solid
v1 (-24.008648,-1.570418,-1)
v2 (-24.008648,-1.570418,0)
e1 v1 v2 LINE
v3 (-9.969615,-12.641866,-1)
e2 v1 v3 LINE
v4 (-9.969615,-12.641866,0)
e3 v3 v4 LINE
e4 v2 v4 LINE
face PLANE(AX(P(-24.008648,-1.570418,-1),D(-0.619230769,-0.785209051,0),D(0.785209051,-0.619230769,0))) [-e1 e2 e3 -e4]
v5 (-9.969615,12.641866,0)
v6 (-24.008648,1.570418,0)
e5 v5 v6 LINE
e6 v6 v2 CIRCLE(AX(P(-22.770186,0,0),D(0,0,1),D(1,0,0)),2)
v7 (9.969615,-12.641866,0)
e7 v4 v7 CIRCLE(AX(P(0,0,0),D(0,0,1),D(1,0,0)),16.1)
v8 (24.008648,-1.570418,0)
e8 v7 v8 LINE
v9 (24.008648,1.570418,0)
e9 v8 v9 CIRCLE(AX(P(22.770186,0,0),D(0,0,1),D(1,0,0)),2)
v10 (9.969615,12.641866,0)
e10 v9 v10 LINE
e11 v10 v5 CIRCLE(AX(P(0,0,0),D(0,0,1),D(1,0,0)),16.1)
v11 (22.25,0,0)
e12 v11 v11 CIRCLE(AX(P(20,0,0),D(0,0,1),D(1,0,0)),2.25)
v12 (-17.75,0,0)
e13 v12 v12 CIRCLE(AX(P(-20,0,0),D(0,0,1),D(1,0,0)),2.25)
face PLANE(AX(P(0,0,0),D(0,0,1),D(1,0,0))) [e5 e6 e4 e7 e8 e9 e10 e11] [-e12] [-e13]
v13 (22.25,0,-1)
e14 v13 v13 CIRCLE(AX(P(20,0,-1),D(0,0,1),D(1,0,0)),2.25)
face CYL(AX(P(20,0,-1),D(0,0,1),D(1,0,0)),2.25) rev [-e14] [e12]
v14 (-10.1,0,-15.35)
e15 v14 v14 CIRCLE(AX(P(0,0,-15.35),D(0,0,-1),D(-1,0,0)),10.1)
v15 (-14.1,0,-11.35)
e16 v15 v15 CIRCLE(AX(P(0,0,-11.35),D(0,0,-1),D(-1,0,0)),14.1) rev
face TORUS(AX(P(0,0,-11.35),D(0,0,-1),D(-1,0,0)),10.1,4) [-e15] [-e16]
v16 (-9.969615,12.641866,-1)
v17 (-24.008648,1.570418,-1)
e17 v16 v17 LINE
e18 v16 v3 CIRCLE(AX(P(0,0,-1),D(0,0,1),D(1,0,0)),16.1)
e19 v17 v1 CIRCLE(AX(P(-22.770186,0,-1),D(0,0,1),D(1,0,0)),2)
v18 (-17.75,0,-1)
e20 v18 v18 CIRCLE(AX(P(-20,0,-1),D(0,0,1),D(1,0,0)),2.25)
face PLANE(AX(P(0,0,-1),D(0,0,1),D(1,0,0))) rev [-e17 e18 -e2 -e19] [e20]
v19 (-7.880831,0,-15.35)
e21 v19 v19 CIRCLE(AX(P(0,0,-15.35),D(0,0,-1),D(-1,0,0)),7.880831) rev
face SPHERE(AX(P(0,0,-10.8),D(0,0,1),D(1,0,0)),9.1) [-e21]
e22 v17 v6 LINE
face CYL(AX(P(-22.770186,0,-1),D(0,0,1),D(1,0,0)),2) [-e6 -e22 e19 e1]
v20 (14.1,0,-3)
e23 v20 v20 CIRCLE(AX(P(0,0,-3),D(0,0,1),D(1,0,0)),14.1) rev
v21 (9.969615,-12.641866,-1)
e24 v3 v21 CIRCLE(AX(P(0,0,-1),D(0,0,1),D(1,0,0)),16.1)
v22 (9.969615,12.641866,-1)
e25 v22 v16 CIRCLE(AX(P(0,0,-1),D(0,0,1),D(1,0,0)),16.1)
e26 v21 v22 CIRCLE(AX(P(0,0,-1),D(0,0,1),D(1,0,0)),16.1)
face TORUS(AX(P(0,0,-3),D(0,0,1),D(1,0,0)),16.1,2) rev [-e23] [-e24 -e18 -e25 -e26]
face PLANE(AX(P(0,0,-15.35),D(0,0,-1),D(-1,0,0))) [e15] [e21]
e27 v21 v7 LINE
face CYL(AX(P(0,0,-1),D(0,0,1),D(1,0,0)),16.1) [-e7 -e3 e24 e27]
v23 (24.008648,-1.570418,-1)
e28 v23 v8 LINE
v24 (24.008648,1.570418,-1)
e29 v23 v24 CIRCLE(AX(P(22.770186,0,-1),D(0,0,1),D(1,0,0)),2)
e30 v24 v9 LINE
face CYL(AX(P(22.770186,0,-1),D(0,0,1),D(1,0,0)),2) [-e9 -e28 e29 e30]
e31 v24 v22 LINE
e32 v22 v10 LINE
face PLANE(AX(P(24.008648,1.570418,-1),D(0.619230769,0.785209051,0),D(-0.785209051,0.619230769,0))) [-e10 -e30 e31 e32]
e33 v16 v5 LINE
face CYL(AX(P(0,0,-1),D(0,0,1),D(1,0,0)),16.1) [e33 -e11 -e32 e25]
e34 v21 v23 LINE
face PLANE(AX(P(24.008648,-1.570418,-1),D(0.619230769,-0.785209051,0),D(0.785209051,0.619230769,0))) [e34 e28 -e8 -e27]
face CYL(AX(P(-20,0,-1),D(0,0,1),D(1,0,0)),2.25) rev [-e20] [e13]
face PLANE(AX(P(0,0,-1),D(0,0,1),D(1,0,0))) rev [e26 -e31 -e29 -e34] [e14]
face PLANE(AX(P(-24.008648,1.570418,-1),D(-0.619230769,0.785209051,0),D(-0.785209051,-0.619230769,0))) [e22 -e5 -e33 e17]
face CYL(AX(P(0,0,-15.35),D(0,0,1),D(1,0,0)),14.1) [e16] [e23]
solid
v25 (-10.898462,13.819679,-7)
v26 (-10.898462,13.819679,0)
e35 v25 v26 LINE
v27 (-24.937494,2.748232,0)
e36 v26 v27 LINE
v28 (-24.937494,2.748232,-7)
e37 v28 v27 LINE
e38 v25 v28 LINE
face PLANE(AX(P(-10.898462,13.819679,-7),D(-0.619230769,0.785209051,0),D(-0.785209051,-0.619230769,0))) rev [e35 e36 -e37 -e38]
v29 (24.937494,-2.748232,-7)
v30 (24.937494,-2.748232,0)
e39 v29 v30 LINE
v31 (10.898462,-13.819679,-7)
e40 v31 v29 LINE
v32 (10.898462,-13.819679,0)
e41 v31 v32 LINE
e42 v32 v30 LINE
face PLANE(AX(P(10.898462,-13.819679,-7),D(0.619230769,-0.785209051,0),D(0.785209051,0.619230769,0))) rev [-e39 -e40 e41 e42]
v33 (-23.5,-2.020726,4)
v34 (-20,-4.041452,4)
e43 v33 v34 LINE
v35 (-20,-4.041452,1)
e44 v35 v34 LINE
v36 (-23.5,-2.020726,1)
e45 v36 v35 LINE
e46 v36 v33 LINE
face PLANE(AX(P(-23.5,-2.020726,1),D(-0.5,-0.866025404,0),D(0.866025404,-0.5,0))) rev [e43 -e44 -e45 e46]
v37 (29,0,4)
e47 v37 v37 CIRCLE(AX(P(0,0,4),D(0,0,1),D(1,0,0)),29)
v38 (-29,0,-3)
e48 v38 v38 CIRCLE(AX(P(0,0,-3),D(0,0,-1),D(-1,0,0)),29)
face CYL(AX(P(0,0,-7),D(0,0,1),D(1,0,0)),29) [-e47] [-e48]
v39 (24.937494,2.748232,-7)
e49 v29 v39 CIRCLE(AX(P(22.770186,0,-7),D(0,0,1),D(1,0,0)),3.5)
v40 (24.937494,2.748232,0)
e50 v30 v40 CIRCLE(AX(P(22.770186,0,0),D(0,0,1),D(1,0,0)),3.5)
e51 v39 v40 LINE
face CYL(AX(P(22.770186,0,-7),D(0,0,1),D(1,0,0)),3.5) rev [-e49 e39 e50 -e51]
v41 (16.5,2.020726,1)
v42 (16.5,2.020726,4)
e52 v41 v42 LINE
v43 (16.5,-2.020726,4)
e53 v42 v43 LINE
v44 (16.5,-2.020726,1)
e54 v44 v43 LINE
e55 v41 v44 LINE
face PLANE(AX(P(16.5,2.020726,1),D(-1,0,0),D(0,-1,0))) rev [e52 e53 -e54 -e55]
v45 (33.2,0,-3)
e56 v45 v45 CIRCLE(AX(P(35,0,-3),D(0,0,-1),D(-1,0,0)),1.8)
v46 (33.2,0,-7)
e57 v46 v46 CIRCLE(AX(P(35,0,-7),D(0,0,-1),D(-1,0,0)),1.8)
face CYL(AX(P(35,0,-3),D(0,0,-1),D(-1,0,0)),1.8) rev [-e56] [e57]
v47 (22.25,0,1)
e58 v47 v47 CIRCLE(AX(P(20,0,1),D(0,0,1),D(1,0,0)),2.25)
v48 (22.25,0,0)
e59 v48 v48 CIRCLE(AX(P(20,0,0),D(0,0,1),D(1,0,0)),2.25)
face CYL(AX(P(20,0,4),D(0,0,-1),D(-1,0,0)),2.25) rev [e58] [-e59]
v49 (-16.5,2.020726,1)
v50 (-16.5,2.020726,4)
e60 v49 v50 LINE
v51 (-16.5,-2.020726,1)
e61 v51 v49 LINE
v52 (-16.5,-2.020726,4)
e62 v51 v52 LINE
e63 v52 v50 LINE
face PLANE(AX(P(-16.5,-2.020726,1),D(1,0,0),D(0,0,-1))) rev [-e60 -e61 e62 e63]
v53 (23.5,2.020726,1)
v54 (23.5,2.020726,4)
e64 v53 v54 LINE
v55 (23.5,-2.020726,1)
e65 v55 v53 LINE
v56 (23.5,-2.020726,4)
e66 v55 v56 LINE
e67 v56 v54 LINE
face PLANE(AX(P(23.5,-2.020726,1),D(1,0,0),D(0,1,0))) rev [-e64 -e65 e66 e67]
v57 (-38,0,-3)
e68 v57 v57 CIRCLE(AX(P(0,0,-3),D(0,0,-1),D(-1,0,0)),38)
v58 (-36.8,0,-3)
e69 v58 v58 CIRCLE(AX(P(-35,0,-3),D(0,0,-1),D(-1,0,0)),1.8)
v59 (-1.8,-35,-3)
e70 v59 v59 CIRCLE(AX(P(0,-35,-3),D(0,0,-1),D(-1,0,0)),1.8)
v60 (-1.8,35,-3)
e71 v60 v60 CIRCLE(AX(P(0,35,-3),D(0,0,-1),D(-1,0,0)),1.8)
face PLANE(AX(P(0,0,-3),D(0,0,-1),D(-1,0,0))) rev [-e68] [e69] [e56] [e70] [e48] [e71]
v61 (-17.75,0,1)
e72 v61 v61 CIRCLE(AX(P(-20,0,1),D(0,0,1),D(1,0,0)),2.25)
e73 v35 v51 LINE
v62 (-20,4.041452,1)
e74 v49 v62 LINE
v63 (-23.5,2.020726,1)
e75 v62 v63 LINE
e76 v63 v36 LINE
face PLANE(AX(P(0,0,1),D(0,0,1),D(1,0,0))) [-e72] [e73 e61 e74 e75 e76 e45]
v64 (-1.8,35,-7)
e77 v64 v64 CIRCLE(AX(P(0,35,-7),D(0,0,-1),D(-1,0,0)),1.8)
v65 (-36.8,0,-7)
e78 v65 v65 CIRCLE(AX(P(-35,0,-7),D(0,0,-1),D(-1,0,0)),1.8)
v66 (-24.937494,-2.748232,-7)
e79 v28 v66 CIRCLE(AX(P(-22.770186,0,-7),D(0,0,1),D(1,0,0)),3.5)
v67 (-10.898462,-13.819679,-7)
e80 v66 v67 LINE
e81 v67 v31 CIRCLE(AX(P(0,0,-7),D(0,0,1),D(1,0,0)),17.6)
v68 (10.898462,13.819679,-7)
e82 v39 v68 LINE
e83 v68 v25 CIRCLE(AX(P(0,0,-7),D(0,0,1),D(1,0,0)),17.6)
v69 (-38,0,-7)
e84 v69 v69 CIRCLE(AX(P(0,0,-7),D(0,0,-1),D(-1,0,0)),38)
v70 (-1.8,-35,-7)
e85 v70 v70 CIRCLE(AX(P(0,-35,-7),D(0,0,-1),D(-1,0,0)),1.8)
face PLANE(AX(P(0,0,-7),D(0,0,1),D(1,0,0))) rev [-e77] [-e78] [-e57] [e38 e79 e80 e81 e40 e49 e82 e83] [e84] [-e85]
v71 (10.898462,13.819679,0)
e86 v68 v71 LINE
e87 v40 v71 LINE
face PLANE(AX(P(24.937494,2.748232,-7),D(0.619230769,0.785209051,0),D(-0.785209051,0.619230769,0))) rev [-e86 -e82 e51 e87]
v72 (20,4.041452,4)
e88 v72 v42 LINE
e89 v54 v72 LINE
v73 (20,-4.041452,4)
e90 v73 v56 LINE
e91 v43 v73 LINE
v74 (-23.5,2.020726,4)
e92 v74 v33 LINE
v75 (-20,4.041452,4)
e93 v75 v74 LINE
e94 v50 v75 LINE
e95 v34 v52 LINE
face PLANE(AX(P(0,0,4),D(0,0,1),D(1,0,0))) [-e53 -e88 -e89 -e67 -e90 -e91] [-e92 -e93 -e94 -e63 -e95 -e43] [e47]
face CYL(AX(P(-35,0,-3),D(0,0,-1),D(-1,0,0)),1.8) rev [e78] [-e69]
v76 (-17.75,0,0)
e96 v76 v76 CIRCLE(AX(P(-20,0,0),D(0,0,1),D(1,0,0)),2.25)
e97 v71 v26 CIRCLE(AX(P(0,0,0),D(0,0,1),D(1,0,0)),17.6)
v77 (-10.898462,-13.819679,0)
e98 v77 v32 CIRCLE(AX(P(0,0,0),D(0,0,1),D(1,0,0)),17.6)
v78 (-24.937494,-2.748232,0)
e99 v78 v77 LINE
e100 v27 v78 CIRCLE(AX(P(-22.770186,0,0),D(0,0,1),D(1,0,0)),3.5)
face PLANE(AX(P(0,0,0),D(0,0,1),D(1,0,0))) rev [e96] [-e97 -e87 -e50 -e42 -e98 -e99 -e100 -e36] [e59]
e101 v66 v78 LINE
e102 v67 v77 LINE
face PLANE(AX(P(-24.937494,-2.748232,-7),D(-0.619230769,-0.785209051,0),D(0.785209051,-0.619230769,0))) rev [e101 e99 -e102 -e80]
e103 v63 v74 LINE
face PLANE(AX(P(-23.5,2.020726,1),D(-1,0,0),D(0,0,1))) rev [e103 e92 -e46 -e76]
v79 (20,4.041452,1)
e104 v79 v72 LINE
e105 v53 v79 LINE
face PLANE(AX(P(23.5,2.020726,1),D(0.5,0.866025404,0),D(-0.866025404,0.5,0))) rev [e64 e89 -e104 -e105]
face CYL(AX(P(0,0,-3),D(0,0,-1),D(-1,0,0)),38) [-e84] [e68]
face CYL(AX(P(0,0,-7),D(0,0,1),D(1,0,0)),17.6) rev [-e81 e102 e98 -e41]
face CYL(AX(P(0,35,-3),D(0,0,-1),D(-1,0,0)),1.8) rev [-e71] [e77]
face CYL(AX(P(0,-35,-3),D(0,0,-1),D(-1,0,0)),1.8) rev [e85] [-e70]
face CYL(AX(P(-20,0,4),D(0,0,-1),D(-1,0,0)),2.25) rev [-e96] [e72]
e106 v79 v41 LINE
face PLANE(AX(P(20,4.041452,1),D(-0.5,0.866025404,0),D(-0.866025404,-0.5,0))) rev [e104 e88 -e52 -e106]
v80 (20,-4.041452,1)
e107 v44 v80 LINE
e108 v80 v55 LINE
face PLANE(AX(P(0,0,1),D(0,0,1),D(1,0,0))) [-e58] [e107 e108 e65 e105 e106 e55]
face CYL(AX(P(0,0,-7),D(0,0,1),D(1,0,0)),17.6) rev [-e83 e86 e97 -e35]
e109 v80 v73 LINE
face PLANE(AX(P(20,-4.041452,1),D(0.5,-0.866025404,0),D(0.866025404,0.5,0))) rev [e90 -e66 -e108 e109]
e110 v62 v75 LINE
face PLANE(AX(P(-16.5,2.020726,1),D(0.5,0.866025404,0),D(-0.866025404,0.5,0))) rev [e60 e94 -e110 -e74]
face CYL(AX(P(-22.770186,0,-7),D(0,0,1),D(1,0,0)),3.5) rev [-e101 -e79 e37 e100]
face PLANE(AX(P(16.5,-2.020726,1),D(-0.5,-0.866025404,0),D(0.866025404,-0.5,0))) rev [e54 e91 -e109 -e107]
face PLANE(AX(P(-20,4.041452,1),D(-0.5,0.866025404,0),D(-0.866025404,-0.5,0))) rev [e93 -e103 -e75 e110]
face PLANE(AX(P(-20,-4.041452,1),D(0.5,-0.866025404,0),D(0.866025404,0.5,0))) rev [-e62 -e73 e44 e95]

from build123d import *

# Parameters (mm, degrees)
SKETCH_2_R          = 2.25
EXTRUDE_1_DEPTH     = 1
SKETCH_3_R          = 14.1
EXTRUDE_2_DEPTH     = 14.35
FILLET_1_R          = 4
FILLET_2_R          = 2
SKETCH_5_R          = 29
EXTRUDE_3_DEPTH     = 7
EXTRUDE_START       = 4
SKETCH_6_R          = 29
SKETCH_6_R_2        = 2.25
EXTRUDE_4_DEPTH     = 4
SKETCH_7_R          = 38
SKETCH_7_R_2        = 1.8
SKETCH_7_R_3        = 29
EXTRUDE_5_DEPTH     = 4
CUT_EXTRUDE_1_DEPTH = 3


with BuildPart() as part:
    # ｽｹｯﾁ1 → 回転1 (revolve)
    with BuildSketch(Plane(origin=(0, 0, 0), x_dir=(1, 0, 0), z_dir=(0, 1, 0))):
        with BuildLine():
            Line((0, 1.7), (0, 19.9))
            ThreePointArc((0, 19.9), (9.1, 10.8), (0, 1.7))
        make_face()
    revolve(axis=Axis((0, 0, -1.7), (0, 0, -1)))



with BuildPart() as body_2:
    # ｽｹｯﾁ2 → ﾎﾞｽ - 押し出し1 (new body)
    with BuildSketch(Plane.XY):
        with BuildLine():
            Line((-24.008647874, 1.570418103), (-9.969615385, 12.641865728))
            ThreePointArc((-9.969615385, 12.641865728), (0, 16.1), (9.969615385, 12.641865728))
            Line((9.969615385, 12.641865728), (24.008647874, 1.570418103))
            ThreePointArc((24.008647874, 1.570418103), (24.770186335, 0), (24.008647874, -1.570418103))
            Line((24.008647874, -1.570418103), (9.969615385, -12.641865728))
            ThreePointArc((9.969615385, -12.641865728), (0, -16.1), (-9.969615385, -12.641865728))
            Line((-9.969615385, -12.641865728), (-24.008647874, -1.570418103))
            ThreePointArc((-24.008647874, -1.570418103), (-24.770186335, 0), (-24.008647874, 1.570418103))
        make_face()
        with Locations((-20, 0)):
            Circle(SKETCH_2_R, mode=Mode.SUBTRACT)
        with Locations((20, 0)):
            Circle(SKETCH_2_R, mode=Mode.SUBTRACT)
    extrude(amount=-EXTRUDE_1_DEPTH)


with BuildPart() as part_1:
    add(part.part)

    add(body_2.part)  # ﾎﾞｽ - 押し出し2 merges body 2
    # ｽｹｯﾁ3 → ﾎﾞｽ - 押し出し2 (add)
    with BuildSketch(Plane(origin=(0, 0, -1), x_dir=(-1, 0, 0), z_dir=(0, 0, -1))):
        Circle(SKETCH_3_R)
    extrude(amount=EXTRUDE_2_DEPTH)

    # ﾌｨﾚｯﾄ1
    fillet_1_edges = [part_1.edges().sort_by_distance(p)[0] for p in [
        (14.1, 0, -15.35),
    ]]
    fillet(fillet_1_edges, radius=FILLET_1_R)

    # ﾌｨﾚｯﾄ2
    fillet_2_edges = [part_1.edges().sort_by_distance(p)[0] for p in [
        (14.1, 0, -1),
    ]]
    fillet(fillet_2_edges, radius=FILLET_2_R - 0.0001)  # a hair under: the kernel refuses the full size


with BuildPart() as body_2_2:
    # ｽｹｯﾁ5 → ﾎﾞｽ - 押し出し3 (new body)
    with BuildSketch(Plane.XY):
        Circle(SKETCH_5_R)
        with BuildLine():
            Line((-10.898461538, 13.819679305), (-24.937494028, 2.74823168))
            ThreePointArc((-24.937494028, 2.74823168), (-26.270186335, 0), (-24.937494028, -2.74823168))
            Line((-24.937494028, -2.74823168), (-10.898461538, -13.819679305))
            ThreePointArc((-10.898461538, -13.819679305), (0, -17.6), (10.898461538, -13.819679305))
            Line((10.898461538, -13.819679305), (24.937494028, -2.74823168))
            ThreePointArc((24.937494028, -2.74823168), (26.270186335, 0), (24.937494028, 2.74823168))
            Line((24.937494028, 2.74823168), (10.898461538, 13.819679305))
            ThreePointArc((10.898461538, 13.819679305), (0, 17.6), (-10.898461538, 13.819679305))
        make_face(mode=Mode.SUBTRACT)
    extrude(amount=-EXTRUDE_3_DEPTH)

    # ｽｹｯﾁ6 → ﾎﾞｽ - 押し出し4 (add)
    with BuildSketch(Plane.XY.offset(EXTRUDE_START)):
        Circle(SKETCH_6_R)
        with Locations((20, 0)):
            Circle(SKETCH_6_R_2, mode=Mode.SUBTRACT)
        with Locations((-20, 0)):
            Circle(SKETCH_6_R_2, mode=Mode.SUBTRACT)
    extrude(amount=-EXTRUDE_4_DEPTH)

    # ｽｹｯﾁ7 → ﾎﾞｽ - 押し出し5 (add)
    with BuildSketch(Plane(origin=(0, 0, -7), x_dir=(-1, 0, 0), z_dir=(0, 0, -1))):
        Circle(SKETCH_7_R)
        with Locations((0, 35)):
            Circle(SKETCH_7_R_2, mode=Mode.SUBTRACT)
        with Locations((35, 0)):
            Circle(SKETCH_7_R_2, mode=Mode.SUBTRACT)
        with Locations((0, -35)):
            Circle(SKETCH_7_R_2, mode=Mode.SUBTRACT)
        with Locations((-35, 0)):
            Circle(SKETCH_7_R_2, mode=Mode.SUBTRACT)
        with Locations(Location((0, 0, 0), (0, 0, 180))):
            Circle(SKETCH_7_R_3, mode=Mode.SUBTRACT)
    extrude(amount=-EXTRUDE_5_DEPTH)

    # ｽｹｯﾁ8 → ｶｯﾄ - 押し出し1 (cut)
    with BuildSketch(Plane.XY.offset(4)):
        Polygon((-20, 4.041451884), (-23.5, 2.020725942), (-23.5, -2.020725942), (-20, -4.041451884), (-16.5, -2.020725942), (-16.5, 2.020725942), align=None)
        Polygon((20, 4.041451884), (16.5, 2.020725942), (16.5, -2.020725942), (20, -4.041451884), (23.5, -2.020725942), (23.5, 2.020725942), align=None)
    extrude(amount=-CUT_EXTRUDE_1_DEPTH, mode=Mode.SUBTRACT)


solid = Compound([part_1.part, body_2_2.part])
